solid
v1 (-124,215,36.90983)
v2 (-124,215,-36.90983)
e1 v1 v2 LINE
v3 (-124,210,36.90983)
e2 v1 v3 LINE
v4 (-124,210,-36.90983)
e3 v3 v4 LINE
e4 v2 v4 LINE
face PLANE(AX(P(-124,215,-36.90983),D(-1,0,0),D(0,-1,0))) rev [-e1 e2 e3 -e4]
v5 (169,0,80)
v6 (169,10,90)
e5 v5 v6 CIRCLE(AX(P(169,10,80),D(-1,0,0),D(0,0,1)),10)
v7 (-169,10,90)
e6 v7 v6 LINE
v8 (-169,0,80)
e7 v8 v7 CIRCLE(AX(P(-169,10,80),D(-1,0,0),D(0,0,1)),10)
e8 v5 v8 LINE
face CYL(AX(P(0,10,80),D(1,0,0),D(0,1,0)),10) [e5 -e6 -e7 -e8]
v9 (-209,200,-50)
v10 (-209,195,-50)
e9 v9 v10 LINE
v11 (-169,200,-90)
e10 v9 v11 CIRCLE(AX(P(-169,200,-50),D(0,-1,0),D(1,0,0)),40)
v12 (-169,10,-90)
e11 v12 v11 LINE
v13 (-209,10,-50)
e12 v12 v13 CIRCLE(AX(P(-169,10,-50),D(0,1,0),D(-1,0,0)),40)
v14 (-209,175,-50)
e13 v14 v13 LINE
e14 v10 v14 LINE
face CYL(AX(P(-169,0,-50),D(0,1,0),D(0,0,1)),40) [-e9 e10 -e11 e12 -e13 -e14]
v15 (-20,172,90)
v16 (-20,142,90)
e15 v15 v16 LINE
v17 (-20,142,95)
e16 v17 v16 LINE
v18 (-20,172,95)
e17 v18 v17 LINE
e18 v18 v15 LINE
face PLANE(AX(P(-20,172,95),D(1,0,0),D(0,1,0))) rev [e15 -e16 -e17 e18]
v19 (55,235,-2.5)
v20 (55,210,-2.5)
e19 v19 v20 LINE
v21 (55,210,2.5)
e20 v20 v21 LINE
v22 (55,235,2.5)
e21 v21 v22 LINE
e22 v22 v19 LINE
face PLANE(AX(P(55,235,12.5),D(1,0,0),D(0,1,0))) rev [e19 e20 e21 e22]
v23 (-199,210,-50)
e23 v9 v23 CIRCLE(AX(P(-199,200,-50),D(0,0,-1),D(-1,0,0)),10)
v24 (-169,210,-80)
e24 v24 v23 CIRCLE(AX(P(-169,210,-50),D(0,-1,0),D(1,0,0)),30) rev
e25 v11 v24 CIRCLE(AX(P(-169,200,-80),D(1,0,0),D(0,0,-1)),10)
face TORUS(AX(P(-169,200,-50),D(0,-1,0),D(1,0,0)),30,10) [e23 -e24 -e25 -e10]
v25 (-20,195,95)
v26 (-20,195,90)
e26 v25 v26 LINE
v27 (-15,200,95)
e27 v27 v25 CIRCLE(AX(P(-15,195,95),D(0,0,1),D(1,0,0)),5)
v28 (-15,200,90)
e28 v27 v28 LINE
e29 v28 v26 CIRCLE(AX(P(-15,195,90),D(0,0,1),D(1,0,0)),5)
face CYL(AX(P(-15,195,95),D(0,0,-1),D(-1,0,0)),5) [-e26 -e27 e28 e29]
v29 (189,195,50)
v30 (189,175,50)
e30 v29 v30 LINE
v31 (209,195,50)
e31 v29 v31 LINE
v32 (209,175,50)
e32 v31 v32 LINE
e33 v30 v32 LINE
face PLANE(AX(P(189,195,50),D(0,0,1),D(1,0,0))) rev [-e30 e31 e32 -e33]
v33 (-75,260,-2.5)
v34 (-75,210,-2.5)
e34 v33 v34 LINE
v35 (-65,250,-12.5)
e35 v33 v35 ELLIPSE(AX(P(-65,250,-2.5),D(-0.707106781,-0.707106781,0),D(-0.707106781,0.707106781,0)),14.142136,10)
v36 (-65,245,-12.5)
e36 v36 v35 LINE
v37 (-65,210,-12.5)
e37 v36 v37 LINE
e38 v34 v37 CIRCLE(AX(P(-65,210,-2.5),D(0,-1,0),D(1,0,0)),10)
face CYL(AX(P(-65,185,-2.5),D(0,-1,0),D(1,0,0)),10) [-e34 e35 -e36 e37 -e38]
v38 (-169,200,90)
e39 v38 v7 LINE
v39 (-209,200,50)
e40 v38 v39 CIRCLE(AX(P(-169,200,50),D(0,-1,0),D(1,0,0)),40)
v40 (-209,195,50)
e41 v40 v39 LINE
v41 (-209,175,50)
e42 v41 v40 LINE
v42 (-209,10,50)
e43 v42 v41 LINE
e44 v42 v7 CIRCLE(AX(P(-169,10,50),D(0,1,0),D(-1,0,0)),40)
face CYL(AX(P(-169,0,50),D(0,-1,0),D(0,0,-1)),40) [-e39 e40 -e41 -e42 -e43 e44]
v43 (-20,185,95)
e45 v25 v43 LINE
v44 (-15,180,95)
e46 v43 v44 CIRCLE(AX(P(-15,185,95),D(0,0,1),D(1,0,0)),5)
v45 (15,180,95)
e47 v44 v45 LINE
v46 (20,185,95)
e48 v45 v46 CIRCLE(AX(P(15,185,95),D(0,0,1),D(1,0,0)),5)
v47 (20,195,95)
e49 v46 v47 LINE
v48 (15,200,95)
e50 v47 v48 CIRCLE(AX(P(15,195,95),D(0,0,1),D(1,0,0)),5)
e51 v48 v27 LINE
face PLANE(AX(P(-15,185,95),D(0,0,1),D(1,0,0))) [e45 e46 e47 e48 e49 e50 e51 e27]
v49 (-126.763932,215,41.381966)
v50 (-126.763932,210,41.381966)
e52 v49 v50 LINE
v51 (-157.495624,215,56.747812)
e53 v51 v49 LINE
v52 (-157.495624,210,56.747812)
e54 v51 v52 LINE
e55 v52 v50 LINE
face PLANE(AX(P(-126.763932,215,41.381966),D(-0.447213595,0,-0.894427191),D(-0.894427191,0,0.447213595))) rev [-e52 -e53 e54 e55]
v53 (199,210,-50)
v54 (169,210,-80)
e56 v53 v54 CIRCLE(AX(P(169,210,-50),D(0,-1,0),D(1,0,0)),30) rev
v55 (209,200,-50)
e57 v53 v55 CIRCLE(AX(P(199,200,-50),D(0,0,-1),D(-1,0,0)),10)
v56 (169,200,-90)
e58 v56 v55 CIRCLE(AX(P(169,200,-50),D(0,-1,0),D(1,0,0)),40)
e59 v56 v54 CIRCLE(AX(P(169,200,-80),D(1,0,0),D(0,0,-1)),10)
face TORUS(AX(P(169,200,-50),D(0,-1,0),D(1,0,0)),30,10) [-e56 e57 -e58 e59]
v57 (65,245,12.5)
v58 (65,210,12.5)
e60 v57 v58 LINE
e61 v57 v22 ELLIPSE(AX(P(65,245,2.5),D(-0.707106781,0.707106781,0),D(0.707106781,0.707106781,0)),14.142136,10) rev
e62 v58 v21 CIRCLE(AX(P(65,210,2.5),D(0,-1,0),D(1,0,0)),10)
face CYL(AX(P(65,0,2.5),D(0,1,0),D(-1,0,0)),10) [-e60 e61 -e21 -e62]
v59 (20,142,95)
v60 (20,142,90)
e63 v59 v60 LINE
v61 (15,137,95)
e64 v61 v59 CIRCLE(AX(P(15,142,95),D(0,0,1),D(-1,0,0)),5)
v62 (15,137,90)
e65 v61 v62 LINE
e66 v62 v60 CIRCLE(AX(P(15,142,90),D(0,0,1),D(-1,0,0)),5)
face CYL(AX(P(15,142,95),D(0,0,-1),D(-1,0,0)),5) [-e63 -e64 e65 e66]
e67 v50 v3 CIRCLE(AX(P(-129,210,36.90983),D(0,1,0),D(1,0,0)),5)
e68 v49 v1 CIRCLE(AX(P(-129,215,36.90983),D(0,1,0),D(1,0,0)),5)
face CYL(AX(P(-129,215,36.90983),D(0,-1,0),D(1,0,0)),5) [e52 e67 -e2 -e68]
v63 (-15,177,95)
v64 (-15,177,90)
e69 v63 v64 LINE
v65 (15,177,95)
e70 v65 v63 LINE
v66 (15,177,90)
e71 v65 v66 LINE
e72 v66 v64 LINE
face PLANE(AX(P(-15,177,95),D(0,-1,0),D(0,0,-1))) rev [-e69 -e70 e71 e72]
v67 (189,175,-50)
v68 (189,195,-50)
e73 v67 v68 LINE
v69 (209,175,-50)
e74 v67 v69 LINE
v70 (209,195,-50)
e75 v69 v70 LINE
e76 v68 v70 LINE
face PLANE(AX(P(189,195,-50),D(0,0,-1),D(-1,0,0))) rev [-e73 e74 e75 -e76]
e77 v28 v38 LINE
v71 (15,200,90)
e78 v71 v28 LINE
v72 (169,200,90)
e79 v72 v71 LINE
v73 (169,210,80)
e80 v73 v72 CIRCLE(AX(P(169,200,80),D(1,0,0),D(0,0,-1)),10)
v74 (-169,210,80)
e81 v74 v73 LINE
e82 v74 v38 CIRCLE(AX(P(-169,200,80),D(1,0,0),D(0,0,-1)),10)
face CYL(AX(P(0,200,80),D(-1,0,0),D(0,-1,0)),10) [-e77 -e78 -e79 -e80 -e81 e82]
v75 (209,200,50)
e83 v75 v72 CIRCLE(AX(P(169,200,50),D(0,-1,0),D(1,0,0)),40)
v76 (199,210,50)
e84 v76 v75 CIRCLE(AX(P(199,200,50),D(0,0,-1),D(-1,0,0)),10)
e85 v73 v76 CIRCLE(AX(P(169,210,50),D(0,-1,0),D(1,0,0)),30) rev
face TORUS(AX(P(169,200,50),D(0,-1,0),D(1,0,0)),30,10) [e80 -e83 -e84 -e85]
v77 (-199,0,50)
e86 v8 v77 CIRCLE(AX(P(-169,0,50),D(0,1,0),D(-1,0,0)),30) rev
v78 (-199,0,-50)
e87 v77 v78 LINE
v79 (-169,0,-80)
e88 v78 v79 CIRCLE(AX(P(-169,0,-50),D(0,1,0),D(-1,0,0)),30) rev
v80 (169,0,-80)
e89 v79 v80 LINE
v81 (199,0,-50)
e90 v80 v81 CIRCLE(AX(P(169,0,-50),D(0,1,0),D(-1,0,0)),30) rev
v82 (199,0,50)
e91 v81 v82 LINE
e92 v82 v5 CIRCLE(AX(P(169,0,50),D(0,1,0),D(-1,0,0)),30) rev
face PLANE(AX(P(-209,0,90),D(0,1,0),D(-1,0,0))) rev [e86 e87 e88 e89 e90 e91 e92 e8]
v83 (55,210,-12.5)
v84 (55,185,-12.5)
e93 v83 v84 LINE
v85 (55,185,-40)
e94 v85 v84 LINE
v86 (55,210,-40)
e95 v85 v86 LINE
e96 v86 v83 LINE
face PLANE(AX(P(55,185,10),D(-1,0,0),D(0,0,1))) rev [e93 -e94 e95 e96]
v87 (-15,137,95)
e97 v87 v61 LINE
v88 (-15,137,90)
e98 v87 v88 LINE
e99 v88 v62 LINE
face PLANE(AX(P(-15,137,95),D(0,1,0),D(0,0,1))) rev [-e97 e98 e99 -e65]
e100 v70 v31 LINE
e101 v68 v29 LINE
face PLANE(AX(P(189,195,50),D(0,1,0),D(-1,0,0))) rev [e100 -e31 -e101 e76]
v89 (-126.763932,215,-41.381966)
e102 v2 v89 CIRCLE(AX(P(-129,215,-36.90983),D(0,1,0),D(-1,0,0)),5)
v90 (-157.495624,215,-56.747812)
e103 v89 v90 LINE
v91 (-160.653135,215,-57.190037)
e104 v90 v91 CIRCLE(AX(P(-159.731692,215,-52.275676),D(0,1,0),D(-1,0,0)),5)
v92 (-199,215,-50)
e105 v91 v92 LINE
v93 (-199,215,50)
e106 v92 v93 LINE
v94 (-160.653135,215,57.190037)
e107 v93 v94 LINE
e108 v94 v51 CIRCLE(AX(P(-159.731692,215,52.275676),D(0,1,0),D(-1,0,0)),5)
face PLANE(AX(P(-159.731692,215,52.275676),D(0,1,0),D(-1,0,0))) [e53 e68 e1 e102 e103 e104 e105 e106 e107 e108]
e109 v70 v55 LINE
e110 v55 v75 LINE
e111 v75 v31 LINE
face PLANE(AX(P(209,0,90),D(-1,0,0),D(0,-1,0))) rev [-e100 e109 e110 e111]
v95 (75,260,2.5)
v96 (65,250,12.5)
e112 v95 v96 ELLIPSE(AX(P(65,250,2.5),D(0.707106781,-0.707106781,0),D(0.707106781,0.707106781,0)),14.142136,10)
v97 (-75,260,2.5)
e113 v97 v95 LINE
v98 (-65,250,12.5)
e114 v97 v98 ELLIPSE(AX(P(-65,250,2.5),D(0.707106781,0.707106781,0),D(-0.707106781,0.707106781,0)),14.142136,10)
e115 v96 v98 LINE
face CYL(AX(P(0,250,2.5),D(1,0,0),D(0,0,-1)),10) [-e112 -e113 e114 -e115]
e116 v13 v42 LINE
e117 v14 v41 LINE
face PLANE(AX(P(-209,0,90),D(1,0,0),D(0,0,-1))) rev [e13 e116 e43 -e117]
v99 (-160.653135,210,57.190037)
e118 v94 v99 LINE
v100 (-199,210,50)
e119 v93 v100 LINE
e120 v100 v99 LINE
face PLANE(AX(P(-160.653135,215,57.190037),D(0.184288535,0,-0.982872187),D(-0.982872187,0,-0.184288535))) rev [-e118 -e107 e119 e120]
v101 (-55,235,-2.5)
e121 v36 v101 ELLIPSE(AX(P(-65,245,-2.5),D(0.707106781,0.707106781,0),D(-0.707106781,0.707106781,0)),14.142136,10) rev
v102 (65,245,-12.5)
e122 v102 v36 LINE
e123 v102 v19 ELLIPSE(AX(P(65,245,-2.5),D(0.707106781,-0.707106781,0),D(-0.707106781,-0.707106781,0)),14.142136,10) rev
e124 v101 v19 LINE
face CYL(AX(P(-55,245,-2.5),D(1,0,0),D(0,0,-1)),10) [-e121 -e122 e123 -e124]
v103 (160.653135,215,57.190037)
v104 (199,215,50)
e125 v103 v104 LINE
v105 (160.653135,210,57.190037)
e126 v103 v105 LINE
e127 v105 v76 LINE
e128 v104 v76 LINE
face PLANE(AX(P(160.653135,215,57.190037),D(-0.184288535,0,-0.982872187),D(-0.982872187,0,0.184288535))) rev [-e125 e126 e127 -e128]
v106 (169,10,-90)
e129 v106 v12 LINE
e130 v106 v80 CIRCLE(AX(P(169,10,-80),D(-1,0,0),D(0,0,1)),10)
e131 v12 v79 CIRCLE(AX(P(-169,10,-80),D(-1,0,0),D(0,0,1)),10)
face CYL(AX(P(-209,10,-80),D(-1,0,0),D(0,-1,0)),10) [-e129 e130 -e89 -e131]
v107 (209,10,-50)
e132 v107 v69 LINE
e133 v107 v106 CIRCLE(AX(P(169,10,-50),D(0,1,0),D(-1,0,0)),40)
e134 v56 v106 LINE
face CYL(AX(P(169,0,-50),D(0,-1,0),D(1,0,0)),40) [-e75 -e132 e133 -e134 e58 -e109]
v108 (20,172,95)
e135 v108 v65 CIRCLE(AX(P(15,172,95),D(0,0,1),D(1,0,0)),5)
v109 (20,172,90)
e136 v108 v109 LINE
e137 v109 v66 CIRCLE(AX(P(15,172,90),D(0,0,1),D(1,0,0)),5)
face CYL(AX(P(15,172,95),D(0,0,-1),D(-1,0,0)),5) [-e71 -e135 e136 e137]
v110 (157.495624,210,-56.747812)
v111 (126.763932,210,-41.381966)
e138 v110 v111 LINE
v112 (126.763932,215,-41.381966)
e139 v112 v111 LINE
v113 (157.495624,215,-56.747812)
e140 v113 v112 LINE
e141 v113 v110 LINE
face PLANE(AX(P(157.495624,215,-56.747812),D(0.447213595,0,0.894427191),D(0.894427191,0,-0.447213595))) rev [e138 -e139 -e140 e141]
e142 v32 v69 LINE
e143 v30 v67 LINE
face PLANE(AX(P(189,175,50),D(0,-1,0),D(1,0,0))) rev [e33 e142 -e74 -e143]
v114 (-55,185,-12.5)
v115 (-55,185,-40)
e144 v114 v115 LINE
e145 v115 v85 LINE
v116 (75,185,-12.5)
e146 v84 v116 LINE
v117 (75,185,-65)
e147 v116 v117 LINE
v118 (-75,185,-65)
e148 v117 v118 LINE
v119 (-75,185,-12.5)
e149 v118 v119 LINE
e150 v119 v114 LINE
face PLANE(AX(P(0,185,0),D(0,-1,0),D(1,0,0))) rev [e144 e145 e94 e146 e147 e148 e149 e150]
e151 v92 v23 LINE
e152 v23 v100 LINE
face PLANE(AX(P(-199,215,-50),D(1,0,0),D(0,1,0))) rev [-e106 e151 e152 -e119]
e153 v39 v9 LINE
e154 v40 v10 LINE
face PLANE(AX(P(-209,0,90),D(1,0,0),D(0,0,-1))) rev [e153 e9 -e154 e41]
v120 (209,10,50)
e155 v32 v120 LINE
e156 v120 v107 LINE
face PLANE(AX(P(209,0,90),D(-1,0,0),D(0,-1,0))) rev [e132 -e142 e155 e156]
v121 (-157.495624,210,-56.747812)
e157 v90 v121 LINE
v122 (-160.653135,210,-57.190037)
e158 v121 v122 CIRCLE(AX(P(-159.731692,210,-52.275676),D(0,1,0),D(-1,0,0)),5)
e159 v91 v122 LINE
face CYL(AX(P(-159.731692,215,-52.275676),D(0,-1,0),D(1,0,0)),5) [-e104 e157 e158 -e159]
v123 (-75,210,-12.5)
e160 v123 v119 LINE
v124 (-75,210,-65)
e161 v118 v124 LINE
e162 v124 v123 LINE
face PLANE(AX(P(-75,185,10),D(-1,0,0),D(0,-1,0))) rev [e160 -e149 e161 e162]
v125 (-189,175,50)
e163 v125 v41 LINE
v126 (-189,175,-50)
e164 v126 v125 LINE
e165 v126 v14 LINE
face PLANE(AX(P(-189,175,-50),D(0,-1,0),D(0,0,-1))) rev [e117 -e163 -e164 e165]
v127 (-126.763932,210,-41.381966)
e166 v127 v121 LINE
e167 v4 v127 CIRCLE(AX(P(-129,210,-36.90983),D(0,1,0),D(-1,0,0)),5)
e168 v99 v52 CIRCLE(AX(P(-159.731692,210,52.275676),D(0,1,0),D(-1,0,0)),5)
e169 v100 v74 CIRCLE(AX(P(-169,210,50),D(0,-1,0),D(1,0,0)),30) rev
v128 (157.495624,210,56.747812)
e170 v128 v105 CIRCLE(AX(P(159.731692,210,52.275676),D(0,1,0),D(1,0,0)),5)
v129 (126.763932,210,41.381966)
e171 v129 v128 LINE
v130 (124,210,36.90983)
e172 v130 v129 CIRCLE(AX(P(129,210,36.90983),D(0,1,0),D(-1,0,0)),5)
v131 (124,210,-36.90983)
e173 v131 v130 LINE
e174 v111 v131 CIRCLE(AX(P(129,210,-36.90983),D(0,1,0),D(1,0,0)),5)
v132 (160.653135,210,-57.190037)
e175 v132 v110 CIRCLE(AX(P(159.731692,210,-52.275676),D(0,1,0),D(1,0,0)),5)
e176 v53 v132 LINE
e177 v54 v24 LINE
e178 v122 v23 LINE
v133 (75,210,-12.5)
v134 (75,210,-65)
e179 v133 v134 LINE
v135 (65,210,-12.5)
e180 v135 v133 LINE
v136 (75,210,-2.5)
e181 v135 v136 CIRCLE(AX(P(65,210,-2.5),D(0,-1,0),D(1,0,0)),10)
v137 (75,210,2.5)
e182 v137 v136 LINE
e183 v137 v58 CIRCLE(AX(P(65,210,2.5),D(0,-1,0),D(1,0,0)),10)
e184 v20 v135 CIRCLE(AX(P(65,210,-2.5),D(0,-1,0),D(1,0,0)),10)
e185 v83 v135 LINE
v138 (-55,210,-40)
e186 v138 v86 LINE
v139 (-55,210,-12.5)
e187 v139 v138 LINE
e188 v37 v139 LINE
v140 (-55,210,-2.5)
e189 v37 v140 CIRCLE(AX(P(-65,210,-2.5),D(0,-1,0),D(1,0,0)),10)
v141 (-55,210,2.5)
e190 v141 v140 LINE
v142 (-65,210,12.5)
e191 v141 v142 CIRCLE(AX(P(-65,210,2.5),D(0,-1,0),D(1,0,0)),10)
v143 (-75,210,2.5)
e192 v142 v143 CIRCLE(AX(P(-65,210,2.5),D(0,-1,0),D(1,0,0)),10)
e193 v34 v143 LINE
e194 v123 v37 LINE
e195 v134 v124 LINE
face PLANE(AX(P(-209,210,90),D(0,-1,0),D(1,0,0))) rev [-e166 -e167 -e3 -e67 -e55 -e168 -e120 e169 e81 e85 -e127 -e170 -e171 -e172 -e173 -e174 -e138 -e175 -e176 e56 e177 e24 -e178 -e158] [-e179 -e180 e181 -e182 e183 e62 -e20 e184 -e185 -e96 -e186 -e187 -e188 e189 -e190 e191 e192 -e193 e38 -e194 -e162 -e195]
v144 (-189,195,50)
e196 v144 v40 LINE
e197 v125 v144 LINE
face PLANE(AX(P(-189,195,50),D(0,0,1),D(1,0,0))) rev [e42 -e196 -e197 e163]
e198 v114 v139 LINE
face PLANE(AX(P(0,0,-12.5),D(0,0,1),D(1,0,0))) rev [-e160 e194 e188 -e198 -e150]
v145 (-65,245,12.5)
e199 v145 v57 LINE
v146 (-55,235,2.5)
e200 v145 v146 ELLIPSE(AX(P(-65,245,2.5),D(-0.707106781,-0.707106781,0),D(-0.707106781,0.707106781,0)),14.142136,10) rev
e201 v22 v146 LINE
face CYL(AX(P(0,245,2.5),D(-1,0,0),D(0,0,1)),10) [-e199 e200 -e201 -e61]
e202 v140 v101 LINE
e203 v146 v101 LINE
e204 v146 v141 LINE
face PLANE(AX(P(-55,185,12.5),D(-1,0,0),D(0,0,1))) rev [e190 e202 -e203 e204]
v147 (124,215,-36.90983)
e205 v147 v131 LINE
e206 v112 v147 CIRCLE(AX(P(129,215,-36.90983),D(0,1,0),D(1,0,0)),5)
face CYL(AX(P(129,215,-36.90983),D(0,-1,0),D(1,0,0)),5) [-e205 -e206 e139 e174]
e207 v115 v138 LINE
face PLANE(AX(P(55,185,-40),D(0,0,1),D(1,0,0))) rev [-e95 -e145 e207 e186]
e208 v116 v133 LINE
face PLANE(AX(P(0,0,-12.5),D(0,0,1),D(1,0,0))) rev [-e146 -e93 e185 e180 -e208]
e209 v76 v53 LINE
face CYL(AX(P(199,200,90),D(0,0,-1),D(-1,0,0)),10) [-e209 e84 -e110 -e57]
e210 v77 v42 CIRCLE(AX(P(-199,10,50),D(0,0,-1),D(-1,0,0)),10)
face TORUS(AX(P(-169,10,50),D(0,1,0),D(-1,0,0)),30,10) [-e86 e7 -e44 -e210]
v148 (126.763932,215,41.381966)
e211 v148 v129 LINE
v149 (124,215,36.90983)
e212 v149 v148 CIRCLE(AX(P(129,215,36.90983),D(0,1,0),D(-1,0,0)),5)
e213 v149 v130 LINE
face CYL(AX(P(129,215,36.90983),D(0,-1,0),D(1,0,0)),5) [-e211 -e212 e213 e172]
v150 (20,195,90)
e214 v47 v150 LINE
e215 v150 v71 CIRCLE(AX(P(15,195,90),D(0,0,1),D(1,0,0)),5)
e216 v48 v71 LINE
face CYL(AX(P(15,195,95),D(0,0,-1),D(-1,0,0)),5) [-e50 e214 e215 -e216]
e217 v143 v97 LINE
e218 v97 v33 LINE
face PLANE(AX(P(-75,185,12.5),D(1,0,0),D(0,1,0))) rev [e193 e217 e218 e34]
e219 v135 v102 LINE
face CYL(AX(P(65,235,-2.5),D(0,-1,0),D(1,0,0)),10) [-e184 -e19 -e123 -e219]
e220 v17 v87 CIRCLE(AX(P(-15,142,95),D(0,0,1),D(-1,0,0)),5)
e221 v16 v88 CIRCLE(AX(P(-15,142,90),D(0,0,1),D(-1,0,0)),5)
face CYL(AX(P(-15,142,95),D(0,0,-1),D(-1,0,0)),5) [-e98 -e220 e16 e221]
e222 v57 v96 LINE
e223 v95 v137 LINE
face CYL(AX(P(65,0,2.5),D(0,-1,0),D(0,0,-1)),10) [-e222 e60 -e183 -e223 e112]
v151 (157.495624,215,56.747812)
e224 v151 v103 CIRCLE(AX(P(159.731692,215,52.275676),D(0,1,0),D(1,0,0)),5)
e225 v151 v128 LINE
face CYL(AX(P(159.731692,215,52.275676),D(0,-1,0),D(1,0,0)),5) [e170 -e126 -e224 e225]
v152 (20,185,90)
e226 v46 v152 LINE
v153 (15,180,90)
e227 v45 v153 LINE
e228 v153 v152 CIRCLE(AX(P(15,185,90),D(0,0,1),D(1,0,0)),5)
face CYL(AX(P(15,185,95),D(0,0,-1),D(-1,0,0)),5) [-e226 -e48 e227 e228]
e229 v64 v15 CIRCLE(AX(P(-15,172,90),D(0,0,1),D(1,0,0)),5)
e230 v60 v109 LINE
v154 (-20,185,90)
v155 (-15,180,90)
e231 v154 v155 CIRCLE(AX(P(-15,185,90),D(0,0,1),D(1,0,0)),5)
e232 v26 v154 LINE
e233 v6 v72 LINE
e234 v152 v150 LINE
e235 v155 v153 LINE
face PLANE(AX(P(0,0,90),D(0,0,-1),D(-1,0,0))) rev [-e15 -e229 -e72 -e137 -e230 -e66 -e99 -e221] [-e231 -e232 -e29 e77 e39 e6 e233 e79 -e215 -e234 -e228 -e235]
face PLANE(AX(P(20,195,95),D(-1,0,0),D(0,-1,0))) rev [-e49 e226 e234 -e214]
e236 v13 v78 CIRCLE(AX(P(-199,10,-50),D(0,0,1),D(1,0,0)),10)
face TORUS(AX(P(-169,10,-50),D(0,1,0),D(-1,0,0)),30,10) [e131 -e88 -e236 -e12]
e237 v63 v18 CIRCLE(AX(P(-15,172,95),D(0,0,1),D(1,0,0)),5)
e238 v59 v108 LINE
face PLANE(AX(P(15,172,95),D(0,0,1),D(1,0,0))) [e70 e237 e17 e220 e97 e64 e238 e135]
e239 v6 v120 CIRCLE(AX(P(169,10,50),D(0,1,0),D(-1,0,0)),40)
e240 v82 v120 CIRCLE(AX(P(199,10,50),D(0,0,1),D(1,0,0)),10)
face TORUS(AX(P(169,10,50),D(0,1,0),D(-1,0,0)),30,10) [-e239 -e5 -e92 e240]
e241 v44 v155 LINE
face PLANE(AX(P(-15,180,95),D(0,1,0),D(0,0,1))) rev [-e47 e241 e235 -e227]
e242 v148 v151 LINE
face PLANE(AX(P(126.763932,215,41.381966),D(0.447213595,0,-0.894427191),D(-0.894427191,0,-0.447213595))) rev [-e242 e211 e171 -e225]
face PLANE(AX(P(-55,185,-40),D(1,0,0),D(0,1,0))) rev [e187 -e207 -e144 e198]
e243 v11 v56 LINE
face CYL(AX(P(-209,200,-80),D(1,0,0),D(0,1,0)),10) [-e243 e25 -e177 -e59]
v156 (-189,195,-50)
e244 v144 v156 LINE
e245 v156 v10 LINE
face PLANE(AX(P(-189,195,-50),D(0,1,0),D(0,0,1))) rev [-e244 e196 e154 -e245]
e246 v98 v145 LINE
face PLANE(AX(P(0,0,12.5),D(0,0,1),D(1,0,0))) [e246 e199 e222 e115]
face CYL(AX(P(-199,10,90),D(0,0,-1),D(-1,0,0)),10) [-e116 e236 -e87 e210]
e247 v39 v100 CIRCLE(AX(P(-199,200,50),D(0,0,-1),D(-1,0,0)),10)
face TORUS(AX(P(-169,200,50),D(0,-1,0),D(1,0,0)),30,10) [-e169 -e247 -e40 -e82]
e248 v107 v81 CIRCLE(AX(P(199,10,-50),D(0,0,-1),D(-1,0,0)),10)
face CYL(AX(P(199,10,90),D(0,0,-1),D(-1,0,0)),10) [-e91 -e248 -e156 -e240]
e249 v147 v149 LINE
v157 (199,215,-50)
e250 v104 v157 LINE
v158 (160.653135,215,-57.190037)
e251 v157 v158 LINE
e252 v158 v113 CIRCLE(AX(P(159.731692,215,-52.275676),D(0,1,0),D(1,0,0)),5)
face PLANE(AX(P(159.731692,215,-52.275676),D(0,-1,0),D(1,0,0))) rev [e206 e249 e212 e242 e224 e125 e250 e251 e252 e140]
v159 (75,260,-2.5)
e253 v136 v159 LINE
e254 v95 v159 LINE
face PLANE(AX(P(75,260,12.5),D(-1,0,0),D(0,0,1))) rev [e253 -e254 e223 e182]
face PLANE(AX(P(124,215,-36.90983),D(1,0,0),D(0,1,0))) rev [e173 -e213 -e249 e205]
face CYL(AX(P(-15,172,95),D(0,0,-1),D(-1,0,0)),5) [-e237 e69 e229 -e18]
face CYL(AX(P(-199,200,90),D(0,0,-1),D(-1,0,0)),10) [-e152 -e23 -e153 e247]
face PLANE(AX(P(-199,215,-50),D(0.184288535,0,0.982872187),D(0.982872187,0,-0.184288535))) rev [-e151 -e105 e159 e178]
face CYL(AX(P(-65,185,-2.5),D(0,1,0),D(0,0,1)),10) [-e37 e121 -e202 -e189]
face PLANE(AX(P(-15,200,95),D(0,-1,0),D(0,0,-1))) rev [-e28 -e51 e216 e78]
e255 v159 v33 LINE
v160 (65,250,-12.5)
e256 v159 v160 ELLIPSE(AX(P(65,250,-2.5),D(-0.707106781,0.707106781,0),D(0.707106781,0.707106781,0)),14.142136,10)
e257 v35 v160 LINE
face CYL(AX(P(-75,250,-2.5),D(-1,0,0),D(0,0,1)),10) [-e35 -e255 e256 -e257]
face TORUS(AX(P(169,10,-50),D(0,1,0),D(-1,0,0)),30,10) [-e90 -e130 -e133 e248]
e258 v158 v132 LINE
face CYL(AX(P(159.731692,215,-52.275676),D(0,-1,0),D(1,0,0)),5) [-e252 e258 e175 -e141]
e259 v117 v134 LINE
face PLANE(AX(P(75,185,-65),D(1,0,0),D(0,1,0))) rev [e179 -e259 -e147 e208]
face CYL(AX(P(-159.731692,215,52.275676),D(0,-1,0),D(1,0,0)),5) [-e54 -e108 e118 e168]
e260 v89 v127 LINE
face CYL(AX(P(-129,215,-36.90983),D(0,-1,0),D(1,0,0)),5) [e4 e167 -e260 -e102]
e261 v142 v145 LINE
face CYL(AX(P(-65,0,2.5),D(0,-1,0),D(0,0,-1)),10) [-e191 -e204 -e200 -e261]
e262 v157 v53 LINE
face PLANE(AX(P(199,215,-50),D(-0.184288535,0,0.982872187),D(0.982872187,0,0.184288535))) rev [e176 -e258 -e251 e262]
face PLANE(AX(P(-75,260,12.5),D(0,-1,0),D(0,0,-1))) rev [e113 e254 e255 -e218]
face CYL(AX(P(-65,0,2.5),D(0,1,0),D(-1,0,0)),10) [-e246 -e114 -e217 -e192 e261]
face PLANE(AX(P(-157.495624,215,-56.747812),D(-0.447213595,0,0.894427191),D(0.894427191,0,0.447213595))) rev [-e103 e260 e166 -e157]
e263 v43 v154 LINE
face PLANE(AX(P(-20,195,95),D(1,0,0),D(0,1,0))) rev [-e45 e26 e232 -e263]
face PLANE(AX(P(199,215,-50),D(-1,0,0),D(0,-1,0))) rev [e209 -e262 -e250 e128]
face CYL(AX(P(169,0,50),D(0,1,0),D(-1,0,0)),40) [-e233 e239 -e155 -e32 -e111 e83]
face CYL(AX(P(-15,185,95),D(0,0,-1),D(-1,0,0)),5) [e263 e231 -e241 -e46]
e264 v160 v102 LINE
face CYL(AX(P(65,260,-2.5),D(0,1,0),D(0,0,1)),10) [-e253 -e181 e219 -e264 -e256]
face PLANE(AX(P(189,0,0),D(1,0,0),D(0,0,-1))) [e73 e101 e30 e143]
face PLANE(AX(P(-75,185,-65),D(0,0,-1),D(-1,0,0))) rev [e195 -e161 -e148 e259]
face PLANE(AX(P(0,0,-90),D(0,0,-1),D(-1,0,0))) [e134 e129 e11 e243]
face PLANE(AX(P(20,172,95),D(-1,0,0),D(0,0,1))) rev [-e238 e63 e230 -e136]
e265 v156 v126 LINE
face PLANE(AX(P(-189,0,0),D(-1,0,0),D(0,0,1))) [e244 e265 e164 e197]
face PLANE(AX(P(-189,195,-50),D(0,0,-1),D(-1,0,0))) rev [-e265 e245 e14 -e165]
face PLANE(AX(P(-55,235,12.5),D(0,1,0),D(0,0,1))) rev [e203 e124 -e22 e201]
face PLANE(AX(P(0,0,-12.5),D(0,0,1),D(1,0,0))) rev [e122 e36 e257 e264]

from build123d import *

# Parameters (mm, degrees)
SKIZZE1_W                       = 418
SKIZZE1_H                       = 210
AUFSATZ_LINEAR_AUSTRAGEN1_DEPTH = 90
VERRUNDUNG1_R                   = 40
SCHNITT_LINEAR_AUSTRAGEN1_DEPTH = 25
AUFSATZ_LINEAR_AUSTRAGEN2_DEPTH = 12.5
VERRUNDUNG2_R                   = 10
SKIZZE5_W                       = 100
SKIZZE5_H                       = 20
SCHNITT_LINEAR_AUSTRAGEN2_DEPTH = 20
SKIZZE6_W                       = 100
SKIZZE6_H                       = 20
SCHNITT_LINEAR_AUSTRAGEN3_DEPTH = 20
VERRUNDUNG4_R                   = 10
AUFSATZ_LINEAR_AUSTRAGEN3_DEPTH = 5
AUFSATZ_LINEAR_AUSTRAGEN4_DEPTH = 5


with BuildPart() as part:
    # Skizze1 → Aufsatz-Linear austragen1 (new, symmetric)
    with BuildSketch(Plane.XY):
        with Locations((0, 105)):
            Rectangle(SKIZZE1_W, SKIZZE1_H)
    extrude(amount=AUFSATZ_LINEAR_AUSTRAGEN1_DEPTH, both=True)

    # Verrundung1
    verrundung1_edges = [part.edges().sort_by_distance(p)[0] for p in [
        (209, 105, 90),
        (-209, 105, 90),
        (209, 105, -90),
        (-209, 105, -90),
    ]]
    fillet(verrundung1_edges, radius=VERRUNDUNG1_R)

    # Skizze3 → Schnitt-Linear austragen1 (cut)
    with BuildSketch(Plane(origin=(0, 210, 0), x_dir=(1, 0, 0), z_dir=(0, 1, 0))):
        Polygon((-75, -10), (-75, 65), (75, 65), (75, -10), (55, -10), (55, 40), (-55, 40), (-55, -10), align=None)
    extrude(amount=-SCHNITT_LINEAR_AUSTRAGEN1_DEPTH, mode=Mode.SUBTRACT)

    # Skizze4 → Aufsatz-Linear austragen2 (add, symmetric)
    with BuildSketch(Plane.XY):
        Polygon((-75, 185), (-75, 260), (75, 260), (75, 185), (55, 185), (55, 235), (-55, 235), (-55, 185), align=None)
    extrude(amount=AUFSATZ_LINEAR_AUSTRAGEN2_DEPTH, both=True)

    # Verrundung2
    verrundung2_edges = [part.edges().sort_by_distance(p)[0] for p in [
        (-75, 235, -12.5),
        (-55, 222.5, -12.5),
        (55, 222.5, -12.5),
        (0, 235, -12.5),
        (0, 260, -12.5),
        (75, 235, -12.5),
        (75, 235, 12.5),
        (55, 222.5, 12.5),
        (0, 260, 12.5),
        (0, 235, 12.5),
        (-55, 222.5, 12.5),
        (-75, 235, 12.5),
    ]]
    fillet(verrundung2_edges, radius=VERRUNDUNG2_R - 0.0001)  # a hair under: the kernel refuses the full size

    # Skizze5 → Schnitt-Linear austragen2 (cut)
    with BuildSketch(Plane(origin=(209, 0, 0), x_dir=(0, 0, -1), z_dir=(1, 0, 0))):
        with Locations((0, 185)):
            Rectangle(SKIZZE5_W, SKIZZE5_H)
    extrude(amount=-SCHNITT_LINEAR_AUSTRAGEN2_DEPTH, mode=Mode.SUBTRACT)

    # Skizze6 → Schnitt-Linear austragen3 (cut)
    with BuildSketch(Plane.ZY.offset(209)):
        with Locations((0, 185)):
            Rectangle(SKIZZE6_W, SKIZZE6_H)
    extrude(amount=-SCHNITT_LINEAR_AUSTRAGEN3_DEPTH, mode=Mode.SUBTRACT)

    # Verrundung4
    verrundung4_edges = [part.edges().sort_by_distance(p)[0] for p in [
        (0, 0, 90),
        (0, 210, 90),
        (0, 210, -90),
        (-209, 210, 0),
        (209, 210, 0),
        (-197.284271247, 210, 78.284271247),
        (-197.284271247, 210, -78.284271247),
        (197.284271247, 210, -78.284271247),
        (197.284271247, 210, 78.284271247),
        (209, 0, 0),
        (0, 0, -90),
        (-209, 0, 0),
        (-197.284271247, 0, 78.284271247),
        (-197.284271247, 0, -78.284271247),
        (197.284271247, 0, -78.284271247),
        (197.284271247, 0, 78.284271247),
    ]]
    fillet(verrundung4_edges, radius=VERRUNDUNG4_R)

    # Skizze7 → Aufsatz-Linear austragen3 (add)
    with BuildSketch(Plane(origin=(0, 210, 0), x_dir=(1, 0, 0), z_dir=(0, 1, 0))):
        with BuildLine():
            Line((-199, 50), (-160.65313505, 57.190037178))
            ThreePointArc((-160.65313505, 57.190037178), (-159.038186315, 57.227347612), (-157.495624397, 56.747812198))
            Line((-157.495624397, 56.747812198), (-126.763932023, 41.381966011))
            ThreePointArc((-126.763932023, 41.381966011), (-124.746745958, 39.538485617), (-124, 36.909830056))
            Line((-124, 36.909830056), (-124, -36.909830056))
            ThreePointArc((-124, -36.909830056), (-124.746745958, -39.538485617), (-126.763932023, -41.381966011))
            Line((-126.763932023, -41.381966011), (-157.495624397, -56.747812198))
            ThreePointArc((-157.495624397, -56.747812198), (-159.038186315, -57.227347612), (-160.65313505, -57.190037178))
            Line((-160.65313505, -57.190037178), (-199, -50))
            Line((-199, -50), (-199, 50))
        make_face()
        with BuildLine():
            Line((199, 50), (199, -50))
            Line((199, -50), (160.65313505, -57.190037178))
            ThreePointArc((160.65313505, -57.190037178), (159.038186315, -57.227347612), (157.495624397, -56.747812198))
            Line((157.495624397, -56.747812198), (126.763932023, -41.381966011))
            ThreePointArc((126.763932023, -41.381966011), (124.746745958, -39.538485617), (124, -36.909830056))
            Line((124, -36.909830056), (124, 36.909830056))
            ThreePointArc((124, 36.909830056), (124.746745958, 39.538485617), (126.763932023, 41.381966011))
            Line((126.763932023, 41.381966011), (157.495624397, 56.747812198))
            ThreePointArc((157.495624397, 56.747812198), (159.038186315, 57.227347612), (160.65313505, 57.190037178))
            Line((160.65313505, 57.190037178), (199, 50))
        make_face()
    extrude(amount=AUFSATZ_LINEAR_AUSTRAGEN3_DEPTH)

    # Skizze8 → Aufsatz-Linear austragen4 (add)
    with BuildSketch(Plane.XY.offset(90)):
        with BuildLine():
            Line((-15, 200), (15, 200))
            ThreePointArc((15, 200), (18.535533906, 198.535533906), (20, 195))
            Line((20, 195), (20, 185))
            ThreePointArc((20, 185), (18.535533906, 181.464466094), (15, 180))
            Line((15, 180), (-15, 180))
            ThreePointArc((-15, 180), (-18.535533906, 181.464466094), (-20, 185))
            Line((-20, 185), (-20, 195))
            ThreePointArc((-20, 195), (-18.535533906, 198.535533906), (-15, 200))
        make_face()
        with BuildLine():
            Line((-15, 177), (15, 177))
            ThreePointArc((15, 177), (18.535533906, 175.535533906), (20, 172))
            Line((20, 172), (20, 142))
            ThreePointArc((20, 142), (18.535533906, 138.464466094), (15, 137))
            Line((15, 137), (-15, 137))
            ThreePointArc((-15, 137), (-18.535533906, 138.464466094), (-20, 142))
            Line((-20, 142), (-20, 172))
            ThreePointArc((-20, 172), (-18.535533906, 175.535533906), (-15, 177))
        make_face()
    extrude(amount=AUFSATZ_LINEAR_AUSTRAGEN4_DEPTH)


solid = part.part
